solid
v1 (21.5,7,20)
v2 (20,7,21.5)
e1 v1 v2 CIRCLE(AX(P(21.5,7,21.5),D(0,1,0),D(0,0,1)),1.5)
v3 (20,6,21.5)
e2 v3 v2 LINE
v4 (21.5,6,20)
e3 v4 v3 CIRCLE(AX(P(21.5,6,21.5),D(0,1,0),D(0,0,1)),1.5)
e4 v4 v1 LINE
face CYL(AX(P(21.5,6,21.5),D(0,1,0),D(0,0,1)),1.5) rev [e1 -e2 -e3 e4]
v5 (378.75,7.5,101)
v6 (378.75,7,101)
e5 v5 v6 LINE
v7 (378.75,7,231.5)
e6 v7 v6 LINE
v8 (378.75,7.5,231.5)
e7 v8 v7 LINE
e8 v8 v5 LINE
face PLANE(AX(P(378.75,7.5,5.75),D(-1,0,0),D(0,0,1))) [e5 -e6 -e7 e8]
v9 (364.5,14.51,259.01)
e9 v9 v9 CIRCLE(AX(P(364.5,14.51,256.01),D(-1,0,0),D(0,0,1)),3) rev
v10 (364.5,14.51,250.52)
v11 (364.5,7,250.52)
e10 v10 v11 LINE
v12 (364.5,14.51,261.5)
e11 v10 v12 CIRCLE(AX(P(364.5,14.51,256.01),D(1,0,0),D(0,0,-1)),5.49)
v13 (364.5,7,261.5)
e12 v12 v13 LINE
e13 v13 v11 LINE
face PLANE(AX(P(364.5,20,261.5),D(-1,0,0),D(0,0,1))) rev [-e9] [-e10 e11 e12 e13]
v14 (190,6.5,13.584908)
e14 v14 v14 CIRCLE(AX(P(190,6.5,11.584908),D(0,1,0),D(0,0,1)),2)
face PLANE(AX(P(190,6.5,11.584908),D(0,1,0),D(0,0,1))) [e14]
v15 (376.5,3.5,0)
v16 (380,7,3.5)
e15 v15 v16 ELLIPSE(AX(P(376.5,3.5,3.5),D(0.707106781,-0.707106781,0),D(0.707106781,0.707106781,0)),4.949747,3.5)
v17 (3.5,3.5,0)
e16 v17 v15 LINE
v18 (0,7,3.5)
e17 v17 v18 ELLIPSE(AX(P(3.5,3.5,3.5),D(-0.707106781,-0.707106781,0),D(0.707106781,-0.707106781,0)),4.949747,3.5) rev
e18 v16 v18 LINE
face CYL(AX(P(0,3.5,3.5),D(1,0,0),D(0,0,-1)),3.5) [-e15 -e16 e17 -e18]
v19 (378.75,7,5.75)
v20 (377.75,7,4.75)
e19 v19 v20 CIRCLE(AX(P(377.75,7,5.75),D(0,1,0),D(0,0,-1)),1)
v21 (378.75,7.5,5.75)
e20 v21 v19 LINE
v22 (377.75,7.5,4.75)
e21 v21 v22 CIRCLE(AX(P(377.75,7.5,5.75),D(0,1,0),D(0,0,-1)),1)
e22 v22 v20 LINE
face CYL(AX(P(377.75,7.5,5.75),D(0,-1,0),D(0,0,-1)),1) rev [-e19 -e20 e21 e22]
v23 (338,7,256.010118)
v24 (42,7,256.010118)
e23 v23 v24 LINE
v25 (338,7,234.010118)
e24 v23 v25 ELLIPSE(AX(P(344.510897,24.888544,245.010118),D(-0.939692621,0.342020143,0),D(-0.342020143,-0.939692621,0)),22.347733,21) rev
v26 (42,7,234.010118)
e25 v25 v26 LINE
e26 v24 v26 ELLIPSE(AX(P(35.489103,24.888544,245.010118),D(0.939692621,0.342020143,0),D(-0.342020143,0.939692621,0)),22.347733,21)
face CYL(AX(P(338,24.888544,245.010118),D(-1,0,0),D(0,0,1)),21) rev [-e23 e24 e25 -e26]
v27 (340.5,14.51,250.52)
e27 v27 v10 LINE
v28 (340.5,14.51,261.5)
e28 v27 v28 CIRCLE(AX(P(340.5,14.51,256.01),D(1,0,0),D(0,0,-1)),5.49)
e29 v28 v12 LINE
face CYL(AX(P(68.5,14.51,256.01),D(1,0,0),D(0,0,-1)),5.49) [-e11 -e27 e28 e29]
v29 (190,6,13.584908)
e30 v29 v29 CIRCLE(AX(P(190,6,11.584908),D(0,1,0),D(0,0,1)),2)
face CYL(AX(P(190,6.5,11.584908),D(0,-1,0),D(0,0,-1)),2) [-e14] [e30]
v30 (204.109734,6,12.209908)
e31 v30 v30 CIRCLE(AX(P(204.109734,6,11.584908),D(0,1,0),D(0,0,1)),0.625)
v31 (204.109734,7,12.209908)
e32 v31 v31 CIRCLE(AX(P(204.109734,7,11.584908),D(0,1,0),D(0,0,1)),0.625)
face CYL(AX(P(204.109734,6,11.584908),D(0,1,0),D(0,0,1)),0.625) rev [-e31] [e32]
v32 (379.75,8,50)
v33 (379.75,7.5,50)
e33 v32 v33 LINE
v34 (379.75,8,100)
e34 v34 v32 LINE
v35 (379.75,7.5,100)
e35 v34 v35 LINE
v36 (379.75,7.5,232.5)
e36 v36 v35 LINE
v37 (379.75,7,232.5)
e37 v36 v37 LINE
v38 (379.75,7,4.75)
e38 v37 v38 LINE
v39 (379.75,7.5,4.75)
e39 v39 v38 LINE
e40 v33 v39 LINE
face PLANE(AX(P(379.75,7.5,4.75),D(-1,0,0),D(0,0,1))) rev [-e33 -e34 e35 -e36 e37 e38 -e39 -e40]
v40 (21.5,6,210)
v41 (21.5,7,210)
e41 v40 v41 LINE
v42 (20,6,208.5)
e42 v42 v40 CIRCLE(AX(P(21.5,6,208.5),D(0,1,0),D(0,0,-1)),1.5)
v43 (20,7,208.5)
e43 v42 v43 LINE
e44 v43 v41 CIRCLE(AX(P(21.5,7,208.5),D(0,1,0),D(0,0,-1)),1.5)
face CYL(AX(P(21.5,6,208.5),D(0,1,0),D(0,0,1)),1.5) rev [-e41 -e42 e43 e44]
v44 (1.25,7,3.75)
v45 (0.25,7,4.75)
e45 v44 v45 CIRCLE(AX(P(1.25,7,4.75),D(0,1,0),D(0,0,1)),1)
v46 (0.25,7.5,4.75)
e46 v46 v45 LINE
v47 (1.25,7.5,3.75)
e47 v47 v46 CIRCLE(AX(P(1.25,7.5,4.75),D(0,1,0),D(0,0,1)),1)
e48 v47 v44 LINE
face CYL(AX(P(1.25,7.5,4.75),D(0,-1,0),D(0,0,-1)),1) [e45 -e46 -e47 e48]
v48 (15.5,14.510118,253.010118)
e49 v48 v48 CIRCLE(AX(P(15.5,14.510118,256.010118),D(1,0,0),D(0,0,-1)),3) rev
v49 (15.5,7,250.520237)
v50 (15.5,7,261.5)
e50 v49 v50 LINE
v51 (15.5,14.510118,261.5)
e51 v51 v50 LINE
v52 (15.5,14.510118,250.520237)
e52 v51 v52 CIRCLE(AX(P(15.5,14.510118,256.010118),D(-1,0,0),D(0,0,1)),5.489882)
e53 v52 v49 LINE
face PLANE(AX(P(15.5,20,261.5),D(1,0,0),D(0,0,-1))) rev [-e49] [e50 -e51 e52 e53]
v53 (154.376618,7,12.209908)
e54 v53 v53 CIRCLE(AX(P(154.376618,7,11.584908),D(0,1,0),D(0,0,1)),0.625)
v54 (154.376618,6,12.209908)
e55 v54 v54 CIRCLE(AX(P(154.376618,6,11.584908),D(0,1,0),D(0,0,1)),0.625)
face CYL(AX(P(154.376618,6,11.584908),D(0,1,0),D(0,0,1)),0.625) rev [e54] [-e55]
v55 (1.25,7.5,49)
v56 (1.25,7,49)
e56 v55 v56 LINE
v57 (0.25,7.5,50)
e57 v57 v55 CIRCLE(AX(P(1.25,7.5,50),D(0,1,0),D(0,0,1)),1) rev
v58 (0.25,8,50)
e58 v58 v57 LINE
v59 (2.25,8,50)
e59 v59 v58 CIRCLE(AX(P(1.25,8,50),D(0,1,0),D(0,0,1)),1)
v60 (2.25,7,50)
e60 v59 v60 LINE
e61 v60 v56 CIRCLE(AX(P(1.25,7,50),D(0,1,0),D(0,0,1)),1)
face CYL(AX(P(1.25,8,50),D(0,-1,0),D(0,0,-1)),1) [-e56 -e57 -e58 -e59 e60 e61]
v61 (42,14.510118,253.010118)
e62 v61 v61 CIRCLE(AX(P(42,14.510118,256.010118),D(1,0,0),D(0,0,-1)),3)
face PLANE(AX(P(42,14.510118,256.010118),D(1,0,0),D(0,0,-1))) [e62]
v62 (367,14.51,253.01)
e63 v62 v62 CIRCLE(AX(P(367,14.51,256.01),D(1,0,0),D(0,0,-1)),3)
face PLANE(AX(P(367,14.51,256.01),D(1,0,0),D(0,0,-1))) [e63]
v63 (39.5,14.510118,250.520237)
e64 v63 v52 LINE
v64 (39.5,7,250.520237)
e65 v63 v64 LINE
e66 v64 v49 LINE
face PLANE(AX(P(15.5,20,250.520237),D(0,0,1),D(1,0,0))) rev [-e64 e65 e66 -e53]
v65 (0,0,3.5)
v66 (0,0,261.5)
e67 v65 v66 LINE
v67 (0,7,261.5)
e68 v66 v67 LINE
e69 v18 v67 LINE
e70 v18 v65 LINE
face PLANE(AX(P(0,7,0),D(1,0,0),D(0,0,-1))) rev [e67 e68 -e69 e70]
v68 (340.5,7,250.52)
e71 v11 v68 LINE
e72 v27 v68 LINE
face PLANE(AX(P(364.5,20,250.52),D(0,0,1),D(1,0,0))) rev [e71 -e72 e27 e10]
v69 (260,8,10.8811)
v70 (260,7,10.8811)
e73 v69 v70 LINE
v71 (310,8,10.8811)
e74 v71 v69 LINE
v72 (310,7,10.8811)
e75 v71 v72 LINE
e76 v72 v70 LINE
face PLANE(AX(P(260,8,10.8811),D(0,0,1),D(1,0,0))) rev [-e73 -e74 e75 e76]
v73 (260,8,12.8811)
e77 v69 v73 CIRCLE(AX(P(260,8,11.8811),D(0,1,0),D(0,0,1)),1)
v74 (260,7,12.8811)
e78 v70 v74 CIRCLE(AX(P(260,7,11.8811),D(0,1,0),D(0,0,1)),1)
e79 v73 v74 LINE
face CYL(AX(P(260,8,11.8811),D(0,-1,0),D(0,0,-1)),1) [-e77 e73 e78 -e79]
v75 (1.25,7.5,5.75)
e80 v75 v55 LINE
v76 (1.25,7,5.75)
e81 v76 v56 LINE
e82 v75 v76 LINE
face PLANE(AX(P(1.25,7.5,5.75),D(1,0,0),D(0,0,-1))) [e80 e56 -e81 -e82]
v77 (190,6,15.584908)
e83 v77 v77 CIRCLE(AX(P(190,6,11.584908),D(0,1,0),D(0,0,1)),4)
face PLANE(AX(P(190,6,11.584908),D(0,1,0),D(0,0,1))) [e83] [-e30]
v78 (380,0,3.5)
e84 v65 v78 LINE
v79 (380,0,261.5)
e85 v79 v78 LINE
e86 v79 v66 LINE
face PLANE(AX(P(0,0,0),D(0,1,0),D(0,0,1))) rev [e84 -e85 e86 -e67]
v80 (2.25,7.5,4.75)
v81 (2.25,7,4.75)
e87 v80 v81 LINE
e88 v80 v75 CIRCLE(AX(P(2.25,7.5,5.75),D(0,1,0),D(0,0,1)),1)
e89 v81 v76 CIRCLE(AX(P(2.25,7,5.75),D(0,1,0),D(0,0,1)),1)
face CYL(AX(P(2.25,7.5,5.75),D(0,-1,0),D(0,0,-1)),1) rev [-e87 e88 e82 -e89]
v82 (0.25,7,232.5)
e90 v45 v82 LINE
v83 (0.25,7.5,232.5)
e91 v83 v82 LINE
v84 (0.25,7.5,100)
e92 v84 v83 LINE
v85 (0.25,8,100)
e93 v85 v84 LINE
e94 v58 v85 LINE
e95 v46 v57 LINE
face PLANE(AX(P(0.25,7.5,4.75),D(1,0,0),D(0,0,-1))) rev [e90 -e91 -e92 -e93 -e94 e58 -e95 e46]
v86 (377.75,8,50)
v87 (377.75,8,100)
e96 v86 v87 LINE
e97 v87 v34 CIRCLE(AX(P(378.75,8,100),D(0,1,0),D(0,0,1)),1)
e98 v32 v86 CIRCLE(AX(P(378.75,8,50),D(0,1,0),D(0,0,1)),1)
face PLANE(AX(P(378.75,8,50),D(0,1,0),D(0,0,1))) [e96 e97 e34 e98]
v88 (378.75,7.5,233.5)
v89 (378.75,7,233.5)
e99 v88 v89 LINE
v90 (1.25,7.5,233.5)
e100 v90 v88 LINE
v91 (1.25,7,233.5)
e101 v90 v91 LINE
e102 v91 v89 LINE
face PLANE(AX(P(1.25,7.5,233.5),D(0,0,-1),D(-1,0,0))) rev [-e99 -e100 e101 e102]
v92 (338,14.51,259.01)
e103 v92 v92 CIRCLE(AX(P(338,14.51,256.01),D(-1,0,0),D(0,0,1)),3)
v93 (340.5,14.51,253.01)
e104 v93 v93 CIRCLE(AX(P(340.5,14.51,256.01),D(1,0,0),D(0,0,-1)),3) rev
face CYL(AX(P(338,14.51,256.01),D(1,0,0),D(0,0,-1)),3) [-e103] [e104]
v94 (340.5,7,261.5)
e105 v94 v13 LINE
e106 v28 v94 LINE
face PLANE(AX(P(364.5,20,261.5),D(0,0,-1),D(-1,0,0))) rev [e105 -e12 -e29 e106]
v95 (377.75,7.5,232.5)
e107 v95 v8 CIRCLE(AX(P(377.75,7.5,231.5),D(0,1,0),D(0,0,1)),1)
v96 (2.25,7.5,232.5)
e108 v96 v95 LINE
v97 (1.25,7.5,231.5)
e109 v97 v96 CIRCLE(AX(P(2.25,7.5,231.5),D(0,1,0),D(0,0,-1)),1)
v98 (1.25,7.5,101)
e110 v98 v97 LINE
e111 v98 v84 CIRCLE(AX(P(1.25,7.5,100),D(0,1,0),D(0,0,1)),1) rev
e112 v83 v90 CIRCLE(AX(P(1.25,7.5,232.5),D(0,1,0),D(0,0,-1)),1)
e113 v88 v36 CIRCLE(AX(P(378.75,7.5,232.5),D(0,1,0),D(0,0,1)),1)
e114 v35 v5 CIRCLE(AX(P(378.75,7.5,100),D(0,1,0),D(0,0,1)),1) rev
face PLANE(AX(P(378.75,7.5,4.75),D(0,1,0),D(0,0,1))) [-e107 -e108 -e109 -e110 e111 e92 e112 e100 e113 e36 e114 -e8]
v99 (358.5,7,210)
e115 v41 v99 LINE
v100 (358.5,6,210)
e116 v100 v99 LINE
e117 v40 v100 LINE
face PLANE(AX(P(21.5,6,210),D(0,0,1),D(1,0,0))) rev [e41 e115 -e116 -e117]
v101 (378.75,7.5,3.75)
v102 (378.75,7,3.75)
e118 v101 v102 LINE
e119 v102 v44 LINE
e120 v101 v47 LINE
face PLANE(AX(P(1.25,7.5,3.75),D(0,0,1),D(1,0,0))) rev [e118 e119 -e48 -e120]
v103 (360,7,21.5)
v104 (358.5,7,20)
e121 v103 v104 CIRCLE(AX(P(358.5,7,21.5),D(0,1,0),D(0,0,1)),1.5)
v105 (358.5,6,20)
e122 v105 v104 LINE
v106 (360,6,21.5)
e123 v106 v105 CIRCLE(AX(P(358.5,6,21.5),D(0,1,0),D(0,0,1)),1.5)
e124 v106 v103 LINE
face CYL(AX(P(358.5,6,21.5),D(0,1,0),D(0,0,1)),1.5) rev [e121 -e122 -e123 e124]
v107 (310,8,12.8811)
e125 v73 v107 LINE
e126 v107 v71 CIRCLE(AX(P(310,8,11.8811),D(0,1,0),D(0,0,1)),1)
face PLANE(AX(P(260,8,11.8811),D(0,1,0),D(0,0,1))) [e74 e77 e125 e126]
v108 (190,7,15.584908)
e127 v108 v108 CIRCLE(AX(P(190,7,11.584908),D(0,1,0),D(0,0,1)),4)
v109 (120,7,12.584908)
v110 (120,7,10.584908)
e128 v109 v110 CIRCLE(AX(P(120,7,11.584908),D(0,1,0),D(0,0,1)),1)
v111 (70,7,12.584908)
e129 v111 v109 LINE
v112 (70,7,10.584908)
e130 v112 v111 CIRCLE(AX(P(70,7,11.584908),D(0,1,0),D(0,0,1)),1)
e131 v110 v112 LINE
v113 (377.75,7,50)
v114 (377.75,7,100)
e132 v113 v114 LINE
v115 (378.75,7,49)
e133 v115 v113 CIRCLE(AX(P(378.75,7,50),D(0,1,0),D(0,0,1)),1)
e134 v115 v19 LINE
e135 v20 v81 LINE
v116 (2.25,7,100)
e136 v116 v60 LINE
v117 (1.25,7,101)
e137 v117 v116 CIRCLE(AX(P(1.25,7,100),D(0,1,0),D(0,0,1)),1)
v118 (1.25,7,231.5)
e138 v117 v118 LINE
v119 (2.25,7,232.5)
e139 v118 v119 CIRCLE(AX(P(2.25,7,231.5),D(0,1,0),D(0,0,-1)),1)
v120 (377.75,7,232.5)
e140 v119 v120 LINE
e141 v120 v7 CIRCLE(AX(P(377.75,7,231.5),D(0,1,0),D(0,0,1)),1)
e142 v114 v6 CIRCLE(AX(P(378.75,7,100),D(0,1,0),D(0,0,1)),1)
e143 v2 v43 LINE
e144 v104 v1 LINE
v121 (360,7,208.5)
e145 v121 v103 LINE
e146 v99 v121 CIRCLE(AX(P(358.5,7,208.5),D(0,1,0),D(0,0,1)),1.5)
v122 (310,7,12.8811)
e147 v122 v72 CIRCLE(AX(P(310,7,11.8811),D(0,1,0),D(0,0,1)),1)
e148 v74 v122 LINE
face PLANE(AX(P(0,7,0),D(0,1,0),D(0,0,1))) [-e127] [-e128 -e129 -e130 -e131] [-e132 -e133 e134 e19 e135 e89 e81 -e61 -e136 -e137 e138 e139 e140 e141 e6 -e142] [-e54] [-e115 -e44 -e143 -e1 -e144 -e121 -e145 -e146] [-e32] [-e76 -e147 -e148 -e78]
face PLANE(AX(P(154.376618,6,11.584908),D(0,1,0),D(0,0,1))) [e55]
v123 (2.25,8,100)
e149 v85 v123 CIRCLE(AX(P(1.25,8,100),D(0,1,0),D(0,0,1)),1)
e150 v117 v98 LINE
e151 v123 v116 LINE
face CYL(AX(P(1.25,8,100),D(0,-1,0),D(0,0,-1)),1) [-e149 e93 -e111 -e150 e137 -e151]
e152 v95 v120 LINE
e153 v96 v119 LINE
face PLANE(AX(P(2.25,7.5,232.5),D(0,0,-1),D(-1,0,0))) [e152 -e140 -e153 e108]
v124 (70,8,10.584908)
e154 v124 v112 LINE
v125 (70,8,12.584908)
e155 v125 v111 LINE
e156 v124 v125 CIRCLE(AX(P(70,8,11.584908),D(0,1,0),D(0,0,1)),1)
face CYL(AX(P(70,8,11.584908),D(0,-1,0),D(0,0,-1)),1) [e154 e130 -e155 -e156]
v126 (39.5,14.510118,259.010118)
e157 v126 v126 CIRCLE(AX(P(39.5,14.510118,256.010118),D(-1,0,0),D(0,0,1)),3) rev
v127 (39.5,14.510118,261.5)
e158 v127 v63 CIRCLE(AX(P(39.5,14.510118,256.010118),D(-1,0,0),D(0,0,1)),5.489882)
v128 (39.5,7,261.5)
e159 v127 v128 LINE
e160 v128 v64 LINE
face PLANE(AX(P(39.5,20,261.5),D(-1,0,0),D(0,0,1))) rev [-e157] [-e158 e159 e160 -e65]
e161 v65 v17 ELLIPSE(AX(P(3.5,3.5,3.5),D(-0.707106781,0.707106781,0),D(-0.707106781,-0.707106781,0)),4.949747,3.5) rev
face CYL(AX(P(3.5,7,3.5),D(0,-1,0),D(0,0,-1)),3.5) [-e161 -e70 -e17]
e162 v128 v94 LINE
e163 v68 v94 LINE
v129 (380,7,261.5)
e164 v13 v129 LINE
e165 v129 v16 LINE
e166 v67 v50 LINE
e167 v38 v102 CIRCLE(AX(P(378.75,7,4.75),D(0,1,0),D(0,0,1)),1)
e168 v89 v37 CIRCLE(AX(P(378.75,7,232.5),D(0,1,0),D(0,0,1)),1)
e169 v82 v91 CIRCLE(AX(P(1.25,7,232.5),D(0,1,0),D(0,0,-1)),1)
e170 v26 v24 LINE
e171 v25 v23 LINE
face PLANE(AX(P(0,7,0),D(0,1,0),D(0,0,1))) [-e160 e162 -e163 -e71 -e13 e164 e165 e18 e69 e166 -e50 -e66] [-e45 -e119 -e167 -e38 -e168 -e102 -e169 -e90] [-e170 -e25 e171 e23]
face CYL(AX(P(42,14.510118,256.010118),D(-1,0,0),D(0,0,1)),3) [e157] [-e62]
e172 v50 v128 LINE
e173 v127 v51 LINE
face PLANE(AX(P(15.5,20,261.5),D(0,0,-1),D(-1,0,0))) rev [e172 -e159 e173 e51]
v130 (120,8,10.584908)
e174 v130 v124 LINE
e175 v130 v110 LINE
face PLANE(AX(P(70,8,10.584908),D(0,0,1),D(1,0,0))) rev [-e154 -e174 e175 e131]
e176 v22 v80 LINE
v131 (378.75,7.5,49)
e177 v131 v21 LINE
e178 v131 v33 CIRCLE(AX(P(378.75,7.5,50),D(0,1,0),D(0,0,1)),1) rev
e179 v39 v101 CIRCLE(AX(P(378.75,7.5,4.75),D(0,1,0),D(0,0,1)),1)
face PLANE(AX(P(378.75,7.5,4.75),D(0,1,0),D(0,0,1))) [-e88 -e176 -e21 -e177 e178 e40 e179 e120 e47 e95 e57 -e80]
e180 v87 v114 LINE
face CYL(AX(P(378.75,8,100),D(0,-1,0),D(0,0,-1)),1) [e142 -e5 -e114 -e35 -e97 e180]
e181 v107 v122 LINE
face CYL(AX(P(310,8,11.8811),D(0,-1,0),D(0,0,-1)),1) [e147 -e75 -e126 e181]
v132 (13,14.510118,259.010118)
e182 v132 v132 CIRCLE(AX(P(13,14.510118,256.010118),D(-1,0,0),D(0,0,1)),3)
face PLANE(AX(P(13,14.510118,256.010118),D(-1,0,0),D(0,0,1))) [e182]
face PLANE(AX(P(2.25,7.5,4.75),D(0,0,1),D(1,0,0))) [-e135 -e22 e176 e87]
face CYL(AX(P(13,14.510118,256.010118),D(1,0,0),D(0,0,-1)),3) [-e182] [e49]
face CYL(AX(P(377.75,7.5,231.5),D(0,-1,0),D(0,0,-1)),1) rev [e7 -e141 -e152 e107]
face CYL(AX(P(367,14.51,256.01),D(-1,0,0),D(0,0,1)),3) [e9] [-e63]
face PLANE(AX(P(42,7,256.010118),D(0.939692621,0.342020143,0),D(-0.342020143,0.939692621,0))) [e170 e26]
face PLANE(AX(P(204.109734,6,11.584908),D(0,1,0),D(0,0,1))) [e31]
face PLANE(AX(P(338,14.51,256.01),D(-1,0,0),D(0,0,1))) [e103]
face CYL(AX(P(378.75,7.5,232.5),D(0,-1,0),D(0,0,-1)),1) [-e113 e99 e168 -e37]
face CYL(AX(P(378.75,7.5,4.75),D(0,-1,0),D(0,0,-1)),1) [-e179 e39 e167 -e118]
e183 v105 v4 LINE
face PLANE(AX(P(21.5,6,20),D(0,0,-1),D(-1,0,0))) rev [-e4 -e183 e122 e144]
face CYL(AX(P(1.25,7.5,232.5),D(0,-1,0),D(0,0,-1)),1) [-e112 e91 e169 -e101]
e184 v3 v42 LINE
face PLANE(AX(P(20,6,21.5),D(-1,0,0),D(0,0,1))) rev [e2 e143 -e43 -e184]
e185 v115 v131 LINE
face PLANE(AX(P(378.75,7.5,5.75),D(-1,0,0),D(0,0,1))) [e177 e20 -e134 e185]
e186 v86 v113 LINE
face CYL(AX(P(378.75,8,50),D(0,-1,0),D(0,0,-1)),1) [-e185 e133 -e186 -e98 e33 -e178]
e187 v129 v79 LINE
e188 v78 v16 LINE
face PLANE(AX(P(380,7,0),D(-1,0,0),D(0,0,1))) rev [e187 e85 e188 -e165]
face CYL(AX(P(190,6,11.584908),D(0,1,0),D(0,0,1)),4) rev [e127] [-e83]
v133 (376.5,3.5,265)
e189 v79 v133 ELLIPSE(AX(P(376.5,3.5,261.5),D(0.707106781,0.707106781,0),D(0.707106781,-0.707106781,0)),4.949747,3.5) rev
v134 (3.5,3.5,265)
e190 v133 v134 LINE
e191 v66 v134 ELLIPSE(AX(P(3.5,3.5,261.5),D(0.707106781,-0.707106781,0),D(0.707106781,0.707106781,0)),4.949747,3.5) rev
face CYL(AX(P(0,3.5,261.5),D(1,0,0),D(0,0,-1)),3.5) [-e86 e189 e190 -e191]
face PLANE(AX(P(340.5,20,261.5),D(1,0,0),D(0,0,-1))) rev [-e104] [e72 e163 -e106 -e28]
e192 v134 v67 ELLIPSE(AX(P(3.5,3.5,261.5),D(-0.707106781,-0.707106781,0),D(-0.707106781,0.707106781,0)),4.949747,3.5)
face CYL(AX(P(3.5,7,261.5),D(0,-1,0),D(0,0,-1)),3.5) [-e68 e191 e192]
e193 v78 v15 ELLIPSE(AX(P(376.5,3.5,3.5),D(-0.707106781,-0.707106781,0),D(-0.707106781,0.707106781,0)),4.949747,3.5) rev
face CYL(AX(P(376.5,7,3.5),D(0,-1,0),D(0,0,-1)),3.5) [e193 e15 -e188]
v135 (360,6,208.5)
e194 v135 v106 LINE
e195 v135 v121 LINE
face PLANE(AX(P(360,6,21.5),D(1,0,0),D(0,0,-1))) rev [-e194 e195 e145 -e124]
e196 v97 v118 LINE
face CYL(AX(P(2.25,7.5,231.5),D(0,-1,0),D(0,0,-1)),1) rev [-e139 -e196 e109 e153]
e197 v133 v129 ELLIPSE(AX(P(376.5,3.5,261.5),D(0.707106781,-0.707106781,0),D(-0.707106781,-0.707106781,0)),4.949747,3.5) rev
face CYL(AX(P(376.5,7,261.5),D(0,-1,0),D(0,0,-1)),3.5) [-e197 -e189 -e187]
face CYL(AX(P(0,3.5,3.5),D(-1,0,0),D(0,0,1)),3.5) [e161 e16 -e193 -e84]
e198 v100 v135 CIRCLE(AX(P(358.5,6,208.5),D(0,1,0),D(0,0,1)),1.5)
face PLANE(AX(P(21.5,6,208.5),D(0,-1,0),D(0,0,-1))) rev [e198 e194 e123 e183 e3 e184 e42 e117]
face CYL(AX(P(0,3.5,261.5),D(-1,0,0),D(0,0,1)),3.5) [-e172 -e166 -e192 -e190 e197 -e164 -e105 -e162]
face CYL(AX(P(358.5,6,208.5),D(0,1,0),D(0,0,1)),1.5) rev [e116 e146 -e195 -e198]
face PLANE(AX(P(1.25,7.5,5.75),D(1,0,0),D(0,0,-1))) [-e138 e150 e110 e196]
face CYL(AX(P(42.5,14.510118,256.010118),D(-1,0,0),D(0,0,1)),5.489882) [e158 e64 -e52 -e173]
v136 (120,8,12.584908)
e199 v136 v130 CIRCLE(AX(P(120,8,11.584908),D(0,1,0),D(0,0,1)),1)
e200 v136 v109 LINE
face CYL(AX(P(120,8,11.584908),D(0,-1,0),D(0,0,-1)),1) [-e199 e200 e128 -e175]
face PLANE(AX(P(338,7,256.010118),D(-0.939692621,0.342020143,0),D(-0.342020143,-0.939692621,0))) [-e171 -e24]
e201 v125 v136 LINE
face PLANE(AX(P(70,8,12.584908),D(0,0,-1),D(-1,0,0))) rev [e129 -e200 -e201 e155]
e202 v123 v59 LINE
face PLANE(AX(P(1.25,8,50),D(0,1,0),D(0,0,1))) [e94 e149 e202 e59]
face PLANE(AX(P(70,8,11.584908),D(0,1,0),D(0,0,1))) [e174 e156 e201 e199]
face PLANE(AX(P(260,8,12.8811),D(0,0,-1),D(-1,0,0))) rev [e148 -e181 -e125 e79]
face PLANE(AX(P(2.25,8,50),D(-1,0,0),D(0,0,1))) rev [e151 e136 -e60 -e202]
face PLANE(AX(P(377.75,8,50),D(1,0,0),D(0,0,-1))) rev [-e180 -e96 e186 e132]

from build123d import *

# Parameters (mm, degrees)
SKETCH1_W            = 380
SKETCH1_H            = 265
BOSS_EXTRUDE1_DEPTH  = 7
FILLET2_R            = 3.5
BOSS_EXTRUDE2_DEPTH  = 0.5
CUT_EXTRUDE1_DEPTH   = 1
SKETCH4_R            = 4
CUT_EXTRUDE2_DEPTH   = 1
SKETCH5_R            = 0.625
CUT_EXTRUDE3_DEPTH   = 1
SKETCH6_R            = 0.625
CUT_EXTRUDE4_DEPTH   = 1
SKETCH7_W            = 24
SKETCH7_H            = 10.979763194
BOSS_EXTRUDE3_DEPTH  = 13
CUT_EXTRUDE6_DEPTH   = 27
SKETCH9_R            = 3
BOSS_EXTRUDE4_DEPTH  = 2.5
BOSS_EXTRUDE5_START  = 2.5
SKETCH10_R           = 3
BOSS_EXTRUDE5_DEPTH  = 2.5
SKETCH11_W           = 24
SKETCH11_H           = 10.98
BOSS_EXTRUDE6_DEPTH  = 13
CUT_EXTRUDE9_DEPTH   = 296
SKETCH22_R           = 3
BOSS_EXTRUDE7_DEPTH  = 2.5
BOSS_EXTRUDE8_START  = 2.5
SKETCH23_R           = 3
BOSS_EXTRUDE8_DEPTH  = 2.5
CUT_EXTRUDE10_DEPTH  = 296
DRAFT1_ANGLE         = 20
DRAFT2_ANGLE         = 20
BOSS_EXTRUDE9_DEPTH  = 1
SKETCH33_R           = 2
BOSS_EXTRUDE10_DEPTH = 0.5


with BuildPart() as part:
    # Sketch1 → Boss-Extrude1 (new body)
    with BuildSketch(Plane(origin=(0, 0, 0), x_dir=(1, 0, 0), z_dir=(0, 1, 0))):
        with Locations((190, -132.5)):
            Rectangle(SKETCH1_W, SKETCH1_H)
    extrude(amount=BOSS_EXTRUDE1_DEPTH)

    # Fillet2
    fillet2_edges = [part.edges().sort_by_distance(p)[0] for p in [
        (190, 7, 0),
        (190, 0, 0),
        (190, 0, 265),
        (190, 7, 265),
        (0, 3.5, 0),
        (380, 3.5, 0),
        (380, 3.5, 265),
        (0, 3.5, 265),
    ]]
    fillet(fillet2_edges, radius=FILLET2_R - 0.0001)  # a hair under: the kernel refuses the full size

    # Sketch2 → Boss-Extrude2 (add)
    with BuildSketch(Plane(origin=(0, 7, 0), x_dir=(1, 0, 0), z_dir=(0, 1, 0))):
        with BuildLine():
            Line((1.25, -3.75), (378.75, -3.75))
            ThreePointArc((378.75, -3.75), (379.457106781, -4.042893219), (379.75, -4.75))
            Line((379.75, -4.75), (379.75, -232.5))
            ThreePointArc((379.75, -232.5), (379.457106781, -233.207106781), (378.75, -233.5))
            Line((378.75, -233.5), (1.25, -233.5))
            ThreePointArc((1.25, -233.5), (0.542893219, -233.207106781), (0.25, -232.5))
            Line((0.25, -232.5), (0.25, -4.75))
            ThreePointArc((0.25, -4.75), (0.542893219, -4.042893219), (1.25, -3.75))
        make_face()
        with BuildLine():
            Line((2.25, -4.75), (377.75, -4.75))
            ThreePointArc((377.75, -4.75), (378.457106781, -5.042893219), (378.75, -5.75))
            Line((378.75, -5.75), (378.75, -231.5))
            ThreePointArc((378.75, -231.5), (378.457106781, -232.207106781), (377.75, -232.5))
            Line((377.75, -232.5), (2.25, -232.5))
            ThreePointArc((2.25, -232.5), (1.542893219, -232.207106781), (1.25, -231.5))
            Line((1.25, -231.5), (1.25, -5.75))
            ThreePointArc((1.25, -5.75), (1.542893219, -5.042893219), (2.25, -4.75))
        make_face(mode=Mode.SUBTRACT)
    extrude(amount=BOSS_EXTRUDE2_DEPTH)

    # Sketch3 → Cut-Extrude1 (cut)
    with BuildSketch(Plane(origin=(0, 7, 0), x_dir=(1, 0, 0), z_dir=(0, 1, 0))):
        with BuildLine():
            Line((21.5, -20), (358.5, -20))
            ThreePointArc((358.5, -20), (359.560660172, -20.439339828), (360, -21.5))
            Line((360, -21.5), (360, -208.5))
            ThreePointArc((360, -208.5), (359.560660172, -209.560660172), (358.5, -210))
            Line((358.5, -210), (21.5, -210))
            ThreePointArc((21.5, -210), (20.439339828, -209.560660172), (20, -208.5))
            Line((20, -208.5), (20, -21.5))
            ThreePointArc((20, -21.5), (20.439339828, -20.439339828), (21.5, -20))
        make_face()
    extrude(amount=-CUT_EXTRUDE1_DEPTH, mode=Mode.SUBTRACT)

    # Sketch4 → Cut-Extrude2 (cut)
    with BuildSketch(Plane(origin=(0, 7, 0), x_dir=(1, 0, 0), z_dir=(0, 1, 0))):
        with Locations(Location((190, -11.584908102, 0), (0, 0, 270))):
            Circle(SKETCH4_R)
    extrude(amount=-CUT_EXTRUDE2_DEPTH, mode=Mode.SUBTRACT)

    # Sketch5 → Cut-Extrude3 (cut)
    with BuildSketch(Plane(origin=(0, 7, 0), x_dir=(1, 0, 0), z_dir=(0, 1, 0))):
        with Locations(Location((154.376617555, -11.584908102, 0), (0, 0, 270))):
            Circle(SKETCH5_R)
    extrude(amount=-CUT_EXTRUDE3_DEPTH, mode=Mode.SUBTRACT)

    # Sketch6 → Cut-Extrude4 (cut)
    with BuildSketch(Plane(origin=(0, 7, 0), x_dir=(1, 0, 0), z_dir=(0, 1, 0))):
        with Locations(Location((204.109733731, -11.584908102, 0), (0, 0, 270))):
            Circle(SKETCH6_R)
    extrude(amount=-CUT_EXTRUDE4_DEPTH, mode=Mode.SUBTRACT)

    # Sketch7 → Boss-Extrude3 (add)
    with BuildSketch(Plane(origin=(0, 7, 0), x_dir=(1, 0, 0), z_dir=(0, 1, 0))):
        with Locations((27.5, -256.010118403)):
            Rectangle(SKETCH7_W, SKETCH7_H)
    extrude(amount=BOSS_EXTRUDE3_DEPTH)

    # Sketch8 → Cut-Extrude6 (cut)
    with BuildSketch(Plane.ZY.offset(-15.5)):
        with BuildLine():
            Line((250.520236806, 20), (250.520236806, 14.510118403))
            ThreePointArc((250.520236806, 14.510118403), (252.128185898, 18.392050908), (256.010118403, 20))
            Line((256.010118403, 20), (250.520236806, 20))
        make_face()
        with BuildLine():
            Line((261.5, 20), (256.010118403, 20))
            ThreePointArc((256.010118403, 20), (259.892050908, 18.392050908), (261.5, 14.510118403))
            Line((261.5, 14.510118403), (261.5, 20))
        make_face()
    extrude(amount=-CUT_EXTRUDE6_DEPTH, mode=Mode.SUBTRACT)

    # Sketch9 → Boss-Extrude4 (add)
    with BuildSketch(Plane.ZY.offset(-15.5)):
        with Locations(Location((256.010118403, 14.510118403, 0), (0, 0, 180))):
            Circle(SKETCH9_R)
    extrude(amount=BOSS_EXTRUDE4_DEPTH)

    # Sketch10 → Boss-Extrude5 (add)
    with BuildSketch(Plane(origin=(39.5, 0, 0), x_dir=(0, 0, -1), z_dir=(1, 0, 0)).offset(BOSS_EXTRUDE5_START)):
        with Locations((-256.010118403, 14.510118403)):
            Circle(SKETCH10_R)
    extrude(amount=-BOSS_EXTRUDE5_DEPTH)

    # Sketch11 → Boss-Extrude6 (add)
    with BuildSketch(Plane(origin=(0, 7, 0), x_dir=(1, 0, 0), z_dir=(0, 1, 0))):
        with Locations((352.5, -256.01)):
            Rectangle(SKETCH11_W, SKETCH11_H)
    extrude(amount=BOSS_EXTRUDE6_DEPTH)

    # Sketch21 → Cut-Extrude9 (cut)
    with BuildSketch(Plane(origin=(364.5, 0, 0), x_dir=(0, 0, -1), z_dir=(1, 0, 0))):
        with BuildLine():
            Line((-250.52, 20), (-256.01, 20))
            ThreePointArc((-256.01, 20), (-252.127983771, 18.392016229), (-250.52, 14.51))
            Line((-250.52, 14.51), (-250.52, 20))
        make_face()
        with BuildLine():
            Line((-261.5, 20), (-261.5, 14.51))
            ThreePointArc((-261.5, 14.51), (-259.892016229, 18.392016229), (-256.01, 20))
            Line((-256.01, 20), (-261.5, 20))
        make_face()
    extrude(amount=-CUT_EXTRUDE9_DEPTH, mode=Mode.SUBTRACT)

    # Sketch22 → Boss-Extrude7 (add)
    with BuildSketch(Plane(origin=(364.5, 0, 0), x_dir=(0, 0, -1), z_dir=(1, 0, 0))):
        with Locations(Location((-256.01, 14.51, 0), (0, 0, 180))):
            Circle(SKETCH22_R)
    extrude(amount=BOSS_EXTRUDE7_DEPTH)

    # Sketch23 → Boss-Extrude8 (add)
    with BuildSketch(Plane.ZY.offset(-340.5).offset(BOSS_EXTRUDE8_START)):
        with Locations((256.01, 14.51)):
            Circle(SKETCH23_R)
    extrude(amount=-BOSS_EXTRUDE8_DEPTH)

    # Sketch31 → Cut-Extrude10 (cut)
    with BuildSketch(Plane(origin=(42, 0, 0), x_dir=(0, 0, -1), z_dir=(1, 0, 0))):
        with BuildLine():
            Line((-256.010118403, 7), (-234.010118403, 7))
            ThreePointArc((-234.010118403, 7), (-245.010118403, 3.88854382), (-256.010118403, 7))
        make_face()
    extrude(amount=CUT_EXTRUDE10_DEPTH, mode=Mode.SUBTRACT)

    # Draft1
    draft1_faces = [part.faces().sort_by_distance(p)[0] for p in [
        (338, 5.747159877, 245.010118403),
    ]]
    draft(draft1_faces, Plane.ZX.offset(7), DRAFT1_ANGLE)

    # Draft2
    draft2_faces = [part.faces().sort_by_distance(p)[0] for p in [
        (42, 5.747159877, 245.010118403),
    ]]
    draft(draft2_faces, Plane.ZX.offset(7), DRAFT2_ANGLE)

    # Sketch32 → Boss-Extrude9 (add)
    with BuildSketch(Plane(origin=(0, 7, 0), x_dir=(1, 0, 0), z_dir=(0, 1, 0))):
        with BuildLine():
            Line((70, -10.584908102), (120, -10.584908102))
            ThreePointArc((120, -10.584908102), (121, -11.584908102), (120, -12.584908102))
            Line((120, -12.584908102), (70, -12.584908102))
            ThreePointArc((70, -12.584908102), (69, -11.584908102), (70, -10.584908102))
        make_face()
        with BuildLine():
            Line((260, -10.881099807), (310, -10.881099807))
            ThreePointArc((310, -10.881099807), (311, -11.881099807), (310, -12.881099807))
            Line((310, -12.881099807), (260, -12.881099807))
            ThreePointArc((260, -12.881099807), (259, -11.881099807), (260, -10.881099807))
        make_face()
        with BuildLine():
            Line((2.25, -50), (2.25, -100))
            ThreePointArc((2.25, -100), (1.25, -101), (0.25, -100))
            Line((0.25, -100), (0.25, -50))
            ThreePointArc((0.25, -50), (1.25, -49), (2.25, -50))
        make_face()
        with BuildLine():
            Line((379.75, -50), (379.75, -100))
            ThreePointArc((379.75, -100), (378.75, -101), (377.75, -100))
            Line((377.75, -100), (377.75, -50))
            ThreePointArc((377.75, -50), (378.75, -49), (379.75, -50))
        make_face()
    extrude(amount=BOSS_EXTRUDE9_DEPTH)

    # Sketch33 → Boss-Extrude10 (add)
    with BuildSketch(Plane(origin=(0, 6, 0), x_dir=(1, 0, 0), z_dir=(0, 1, 0))):
        with Locations(Location((190, -11.584908102, 0), (0, 0, 270))):
            Circle(SKETCH33_R)
    extrude(amount=BOSS_EXTRUDE10_DEPTH)


solid = part.part
